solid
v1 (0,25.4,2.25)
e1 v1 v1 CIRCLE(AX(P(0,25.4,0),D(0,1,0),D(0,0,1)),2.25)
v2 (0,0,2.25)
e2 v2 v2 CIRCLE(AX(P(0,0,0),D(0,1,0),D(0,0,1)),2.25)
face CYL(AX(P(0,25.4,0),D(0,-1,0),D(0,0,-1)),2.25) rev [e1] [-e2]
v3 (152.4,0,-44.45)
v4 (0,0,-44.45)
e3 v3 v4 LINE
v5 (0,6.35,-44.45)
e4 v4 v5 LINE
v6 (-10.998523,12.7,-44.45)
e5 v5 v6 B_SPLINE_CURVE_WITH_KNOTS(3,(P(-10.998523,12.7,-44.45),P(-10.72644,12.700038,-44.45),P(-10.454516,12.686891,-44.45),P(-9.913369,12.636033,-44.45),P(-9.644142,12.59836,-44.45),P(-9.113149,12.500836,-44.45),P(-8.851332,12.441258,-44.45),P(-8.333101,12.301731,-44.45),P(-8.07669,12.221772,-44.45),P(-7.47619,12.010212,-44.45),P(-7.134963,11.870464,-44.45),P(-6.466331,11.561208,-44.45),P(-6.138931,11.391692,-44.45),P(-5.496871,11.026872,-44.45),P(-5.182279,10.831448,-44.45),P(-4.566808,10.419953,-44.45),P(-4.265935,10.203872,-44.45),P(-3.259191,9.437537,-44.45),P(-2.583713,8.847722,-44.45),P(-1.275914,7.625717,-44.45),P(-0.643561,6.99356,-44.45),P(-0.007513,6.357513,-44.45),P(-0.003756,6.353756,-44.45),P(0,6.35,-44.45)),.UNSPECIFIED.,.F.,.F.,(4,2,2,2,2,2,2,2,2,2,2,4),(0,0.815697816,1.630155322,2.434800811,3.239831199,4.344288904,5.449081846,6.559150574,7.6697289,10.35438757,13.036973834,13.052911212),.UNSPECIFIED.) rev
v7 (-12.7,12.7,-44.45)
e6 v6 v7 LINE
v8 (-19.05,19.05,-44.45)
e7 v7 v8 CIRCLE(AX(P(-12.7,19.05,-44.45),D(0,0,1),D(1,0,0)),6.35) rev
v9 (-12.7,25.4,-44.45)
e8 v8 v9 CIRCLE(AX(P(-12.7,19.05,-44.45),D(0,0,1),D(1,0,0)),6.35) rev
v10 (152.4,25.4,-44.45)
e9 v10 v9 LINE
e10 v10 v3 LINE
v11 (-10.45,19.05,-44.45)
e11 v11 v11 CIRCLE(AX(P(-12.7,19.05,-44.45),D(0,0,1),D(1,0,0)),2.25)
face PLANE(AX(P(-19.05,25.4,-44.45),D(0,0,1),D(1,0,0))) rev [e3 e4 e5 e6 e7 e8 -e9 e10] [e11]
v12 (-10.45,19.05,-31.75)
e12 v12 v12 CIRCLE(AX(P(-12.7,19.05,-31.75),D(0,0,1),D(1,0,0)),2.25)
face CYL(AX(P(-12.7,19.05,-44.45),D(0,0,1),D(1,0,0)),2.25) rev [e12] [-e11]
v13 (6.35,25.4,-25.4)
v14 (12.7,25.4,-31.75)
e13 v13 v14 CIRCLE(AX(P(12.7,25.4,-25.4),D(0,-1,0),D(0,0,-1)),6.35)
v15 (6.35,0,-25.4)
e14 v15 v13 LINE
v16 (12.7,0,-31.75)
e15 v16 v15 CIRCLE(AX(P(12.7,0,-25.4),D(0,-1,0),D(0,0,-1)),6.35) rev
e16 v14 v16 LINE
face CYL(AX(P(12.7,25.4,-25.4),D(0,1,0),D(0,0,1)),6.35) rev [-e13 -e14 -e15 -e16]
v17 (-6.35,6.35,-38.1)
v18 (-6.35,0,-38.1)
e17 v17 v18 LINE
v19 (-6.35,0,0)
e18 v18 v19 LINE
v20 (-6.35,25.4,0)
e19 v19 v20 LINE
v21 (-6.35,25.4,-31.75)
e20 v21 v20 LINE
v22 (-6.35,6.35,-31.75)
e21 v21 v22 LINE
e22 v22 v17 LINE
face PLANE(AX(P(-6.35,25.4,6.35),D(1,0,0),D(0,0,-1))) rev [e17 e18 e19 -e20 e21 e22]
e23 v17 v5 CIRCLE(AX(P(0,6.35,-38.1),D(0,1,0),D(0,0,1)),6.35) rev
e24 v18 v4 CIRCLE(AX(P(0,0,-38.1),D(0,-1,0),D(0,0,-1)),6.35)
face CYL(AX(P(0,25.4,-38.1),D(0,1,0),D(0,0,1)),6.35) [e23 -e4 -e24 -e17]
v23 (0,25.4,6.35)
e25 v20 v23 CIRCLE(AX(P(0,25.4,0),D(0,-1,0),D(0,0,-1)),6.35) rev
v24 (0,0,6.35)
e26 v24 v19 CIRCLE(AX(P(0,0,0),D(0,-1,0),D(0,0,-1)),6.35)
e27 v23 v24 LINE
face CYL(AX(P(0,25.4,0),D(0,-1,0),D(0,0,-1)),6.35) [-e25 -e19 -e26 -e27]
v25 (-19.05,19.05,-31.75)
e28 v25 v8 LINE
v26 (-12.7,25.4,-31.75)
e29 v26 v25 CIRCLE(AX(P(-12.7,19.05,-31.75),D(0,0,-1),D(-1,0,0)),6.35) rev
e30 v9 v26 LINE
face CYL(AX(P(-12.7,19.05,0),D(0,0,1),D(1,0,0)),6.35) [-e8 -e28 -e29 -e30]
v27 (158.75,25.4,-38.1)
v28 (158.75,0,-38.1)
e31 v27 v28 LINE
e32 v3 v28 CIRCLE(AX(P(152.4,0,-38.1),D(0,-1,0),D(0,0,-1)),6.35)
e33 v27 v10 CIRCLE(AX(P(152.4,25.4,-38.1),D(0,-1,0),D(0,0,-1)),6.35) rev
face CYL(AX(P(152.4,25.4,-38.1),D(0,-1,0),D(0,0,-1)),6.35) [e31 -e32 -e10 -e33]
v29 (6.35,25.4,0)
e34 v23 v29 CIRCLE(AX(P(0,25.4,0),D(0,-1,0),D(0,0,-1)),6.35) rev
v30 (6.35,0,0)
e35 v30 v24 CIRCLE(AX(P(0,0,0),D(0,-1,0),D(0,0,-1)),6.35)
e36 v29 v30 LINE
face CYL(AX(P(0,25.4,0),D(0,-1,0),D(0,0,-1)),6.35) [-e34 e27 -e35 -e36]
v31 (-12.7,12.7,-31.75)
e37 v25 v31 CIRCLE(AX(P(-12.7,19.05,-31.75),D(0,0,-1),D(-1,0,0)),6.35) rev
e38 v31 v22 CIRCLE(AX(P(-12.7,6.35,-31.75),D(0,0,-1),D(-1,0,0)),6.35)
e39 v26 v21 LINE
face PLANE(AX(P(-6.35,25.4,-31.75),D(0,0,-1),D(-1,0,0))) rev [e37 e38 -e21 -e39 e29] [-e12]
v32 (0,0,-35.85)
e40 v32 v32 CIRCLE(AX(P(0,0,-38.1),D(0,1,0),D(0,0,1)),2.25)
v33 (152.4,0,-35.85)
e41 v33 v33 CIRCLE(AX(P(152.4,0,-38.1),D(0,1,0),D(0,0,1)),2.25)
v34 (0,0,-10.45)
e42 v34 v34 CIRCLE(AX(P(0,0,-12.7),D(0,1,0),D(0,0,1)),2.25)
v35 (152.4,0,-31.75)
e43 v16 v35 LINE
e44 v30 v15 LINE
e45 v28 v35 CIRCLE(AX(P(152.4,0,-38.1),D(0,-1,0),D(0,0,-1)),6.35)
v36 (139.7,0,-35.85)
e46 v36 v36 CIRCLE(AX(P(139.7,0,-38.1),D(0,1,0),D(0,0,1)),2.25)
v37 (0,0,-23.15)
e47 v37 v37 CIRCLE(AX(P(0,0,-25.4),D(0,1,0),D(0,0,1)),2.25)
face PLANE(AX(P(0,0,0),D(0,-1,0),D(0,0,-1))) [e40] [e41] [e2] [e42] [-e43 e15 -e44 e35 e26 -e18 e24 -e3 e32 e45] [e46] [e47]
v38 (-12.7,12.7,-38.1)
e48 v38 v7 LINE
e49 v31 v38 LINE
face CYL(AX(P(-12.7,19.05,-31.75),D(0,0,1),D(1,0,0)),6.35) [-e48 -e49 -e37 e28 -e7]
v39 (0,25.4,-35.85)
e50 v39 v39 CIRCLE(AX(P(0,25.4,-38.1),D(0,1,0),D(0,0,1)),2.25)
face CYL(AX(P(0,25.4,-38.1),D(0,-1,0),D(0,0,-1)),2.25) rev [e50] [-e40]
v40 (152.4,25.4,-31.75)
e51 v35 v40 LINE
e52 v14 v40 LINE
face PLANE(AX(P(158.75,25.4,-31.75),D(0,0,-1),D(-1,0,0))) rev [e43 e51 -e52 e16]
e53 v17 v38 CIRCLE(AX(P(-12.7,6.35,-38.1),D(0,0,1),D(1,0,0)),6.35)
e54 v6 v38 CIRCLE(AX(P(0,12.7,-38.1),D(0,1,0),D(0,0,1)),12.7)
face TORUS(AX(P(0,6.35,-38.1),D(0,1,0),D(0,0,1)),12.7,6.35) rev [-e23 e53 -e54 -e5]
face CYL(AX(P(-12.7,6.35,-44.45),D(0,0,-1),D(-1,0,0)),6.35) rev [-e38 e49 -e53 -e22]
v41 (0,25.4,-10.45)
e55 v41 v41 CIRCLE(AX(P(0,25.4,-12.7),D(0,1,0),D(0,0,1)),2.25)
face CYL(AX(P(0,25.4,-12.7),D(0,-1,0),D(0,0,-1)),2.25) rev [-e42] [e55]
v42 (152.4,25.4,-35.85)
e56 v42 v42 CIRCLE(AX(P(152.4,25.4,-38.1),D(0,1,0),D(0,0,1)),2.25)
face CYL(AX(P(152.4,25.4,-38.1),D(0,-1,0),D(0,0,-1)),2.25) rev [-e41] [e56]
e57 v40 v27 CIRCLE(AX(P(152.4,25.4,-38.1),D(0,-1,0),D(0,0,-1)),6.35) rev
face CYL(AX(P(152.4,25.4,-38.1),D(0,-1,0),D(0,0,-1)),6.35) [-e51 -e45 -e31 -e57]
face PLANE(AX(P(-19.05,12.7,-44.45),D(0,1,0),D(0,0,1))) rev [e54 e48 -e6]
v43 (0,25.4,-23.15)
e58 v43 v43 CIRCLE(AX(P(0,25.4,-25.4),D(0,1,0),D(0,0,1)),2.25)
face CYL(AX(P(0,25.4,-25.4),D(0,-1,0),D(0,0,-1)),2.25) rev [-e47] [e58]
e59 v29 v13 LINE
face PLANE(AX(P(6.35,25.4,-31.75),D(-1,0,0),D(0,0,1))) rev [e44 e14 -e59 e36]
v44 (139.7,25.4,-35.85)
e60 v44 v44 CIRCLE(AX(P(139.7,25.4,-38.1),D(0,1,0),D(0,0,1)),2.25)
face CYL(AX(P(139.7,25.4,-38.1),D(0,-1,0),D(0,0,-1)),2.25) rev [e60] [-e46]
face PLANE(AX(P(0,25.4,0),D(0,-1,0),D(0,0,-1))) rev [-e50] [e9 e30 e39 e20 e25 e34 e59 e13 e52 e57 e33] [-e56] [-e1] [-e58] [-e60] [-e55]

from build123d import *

# Parameters (mm, degrees)
SKETCH1_R           = 2.25
BOSS_EXTRUDE1_DEPTH = 25.4
SKETCH2_R           = 2.25
SKETCH2_W           = 12.7
SKETCH2_H           = 12.7
CUT_EXTRUDE1_DEPTH  = 12.7
FILLET1_R           = 6.35
FILLET2_R           = 6.35


with BuildPart() as part:
    # Sketch1 → Boss-Extrude1 (new body)
    with BuildSketch(Plane(origin=(0, 0, 0), x_dir=(1, 0, 0), z_dir=(0, 1, 0))):
        Polygon((158.75, 44.45), (158.75, 31.75), (6.35, 31.75), (6.35, -6.35), (-6.35, -6.35), (-6.35, 31.75), (-19.05, 31.75), (-19.05, 44.45), align=None)
        with Locations(Location((0, 38.1, 0), (0, 0, 270))):
            Circle(SKETCH1_R, mode=Mode.SUBTRACT)
        with Locations(Location((152.4, 38.1, 0), (0, 0, 270))):
            Circle(SKETCH1_R, mode=Mode.SUBTRACT)
        with Locations(Location((139.7, 38.1, 0), (0, 0, 270))):
            Circle(SKETCH1_R, mode=Mode.SUBTRACT)
        with Locations(Location((0, 25.4, 0), (0, 0, 270))):
            Circle(SKETCH1_R, mode=Mode.SUBTRACT)
        with Locations(Location((0, 12.7, 0), (0, 0, 270))):
            Circle(SKETCH1_R, mode=Mode.SUBTRACT)
        with Locations(Location((0, 0, 0), (0, 0, 270))):
            Circle(SKETCH1_R, mode=Mode.SUBTRACT)
    extrude(amount=BOSS_EXTRUDE1_DEPTH)

    # Sketch2 → Cut-Extrude1 (cut)
    with BuildSketch(Plane.XY.offset(-31.75)):
        with Locations((-12.7, 19.05)):
            Circle(SKETCH2_R)
        with Locations((-12.7, 6.35)):
            Rectangle(SKETCH2_W, SKETCH2_H)
    extrude(amount=-CUT_EXTRUDE1_DEPTH, mode=Mode.SUBTRACT)

    # Fillet1
    fillet1_edges = [part.edges().sort_by_distance(p)[0] for p in [
        (158.75, 12.7, -44.45),
        (158.75, 12.7, -31.75),
        (6.35, 12.7, 6.35),
        (-6.35, 12.7, 6.35),
        (-6.35, 6.35, -44.45),
        (6.35, 12.7, -31.75),
        (-19.05, 12.7, -38.1),
        (-19.05, 25.4, -38.1),
    ]]
    fillet(fillet1_edges, radius=FILLET1_R - 0.0001)  # a hair under: the kernel refuses the full size

    # Fillet2
    fillet2_edges = [part.edges().sort_by_distance(p)[0] for p in [
        (-4.49015735, 12.7, -42.59015735),
        (-6.35, 12.7, -34.92505),
    ]]
    fillet(fillet2_edges, radius=FILLET2_R)


solid = part.part
